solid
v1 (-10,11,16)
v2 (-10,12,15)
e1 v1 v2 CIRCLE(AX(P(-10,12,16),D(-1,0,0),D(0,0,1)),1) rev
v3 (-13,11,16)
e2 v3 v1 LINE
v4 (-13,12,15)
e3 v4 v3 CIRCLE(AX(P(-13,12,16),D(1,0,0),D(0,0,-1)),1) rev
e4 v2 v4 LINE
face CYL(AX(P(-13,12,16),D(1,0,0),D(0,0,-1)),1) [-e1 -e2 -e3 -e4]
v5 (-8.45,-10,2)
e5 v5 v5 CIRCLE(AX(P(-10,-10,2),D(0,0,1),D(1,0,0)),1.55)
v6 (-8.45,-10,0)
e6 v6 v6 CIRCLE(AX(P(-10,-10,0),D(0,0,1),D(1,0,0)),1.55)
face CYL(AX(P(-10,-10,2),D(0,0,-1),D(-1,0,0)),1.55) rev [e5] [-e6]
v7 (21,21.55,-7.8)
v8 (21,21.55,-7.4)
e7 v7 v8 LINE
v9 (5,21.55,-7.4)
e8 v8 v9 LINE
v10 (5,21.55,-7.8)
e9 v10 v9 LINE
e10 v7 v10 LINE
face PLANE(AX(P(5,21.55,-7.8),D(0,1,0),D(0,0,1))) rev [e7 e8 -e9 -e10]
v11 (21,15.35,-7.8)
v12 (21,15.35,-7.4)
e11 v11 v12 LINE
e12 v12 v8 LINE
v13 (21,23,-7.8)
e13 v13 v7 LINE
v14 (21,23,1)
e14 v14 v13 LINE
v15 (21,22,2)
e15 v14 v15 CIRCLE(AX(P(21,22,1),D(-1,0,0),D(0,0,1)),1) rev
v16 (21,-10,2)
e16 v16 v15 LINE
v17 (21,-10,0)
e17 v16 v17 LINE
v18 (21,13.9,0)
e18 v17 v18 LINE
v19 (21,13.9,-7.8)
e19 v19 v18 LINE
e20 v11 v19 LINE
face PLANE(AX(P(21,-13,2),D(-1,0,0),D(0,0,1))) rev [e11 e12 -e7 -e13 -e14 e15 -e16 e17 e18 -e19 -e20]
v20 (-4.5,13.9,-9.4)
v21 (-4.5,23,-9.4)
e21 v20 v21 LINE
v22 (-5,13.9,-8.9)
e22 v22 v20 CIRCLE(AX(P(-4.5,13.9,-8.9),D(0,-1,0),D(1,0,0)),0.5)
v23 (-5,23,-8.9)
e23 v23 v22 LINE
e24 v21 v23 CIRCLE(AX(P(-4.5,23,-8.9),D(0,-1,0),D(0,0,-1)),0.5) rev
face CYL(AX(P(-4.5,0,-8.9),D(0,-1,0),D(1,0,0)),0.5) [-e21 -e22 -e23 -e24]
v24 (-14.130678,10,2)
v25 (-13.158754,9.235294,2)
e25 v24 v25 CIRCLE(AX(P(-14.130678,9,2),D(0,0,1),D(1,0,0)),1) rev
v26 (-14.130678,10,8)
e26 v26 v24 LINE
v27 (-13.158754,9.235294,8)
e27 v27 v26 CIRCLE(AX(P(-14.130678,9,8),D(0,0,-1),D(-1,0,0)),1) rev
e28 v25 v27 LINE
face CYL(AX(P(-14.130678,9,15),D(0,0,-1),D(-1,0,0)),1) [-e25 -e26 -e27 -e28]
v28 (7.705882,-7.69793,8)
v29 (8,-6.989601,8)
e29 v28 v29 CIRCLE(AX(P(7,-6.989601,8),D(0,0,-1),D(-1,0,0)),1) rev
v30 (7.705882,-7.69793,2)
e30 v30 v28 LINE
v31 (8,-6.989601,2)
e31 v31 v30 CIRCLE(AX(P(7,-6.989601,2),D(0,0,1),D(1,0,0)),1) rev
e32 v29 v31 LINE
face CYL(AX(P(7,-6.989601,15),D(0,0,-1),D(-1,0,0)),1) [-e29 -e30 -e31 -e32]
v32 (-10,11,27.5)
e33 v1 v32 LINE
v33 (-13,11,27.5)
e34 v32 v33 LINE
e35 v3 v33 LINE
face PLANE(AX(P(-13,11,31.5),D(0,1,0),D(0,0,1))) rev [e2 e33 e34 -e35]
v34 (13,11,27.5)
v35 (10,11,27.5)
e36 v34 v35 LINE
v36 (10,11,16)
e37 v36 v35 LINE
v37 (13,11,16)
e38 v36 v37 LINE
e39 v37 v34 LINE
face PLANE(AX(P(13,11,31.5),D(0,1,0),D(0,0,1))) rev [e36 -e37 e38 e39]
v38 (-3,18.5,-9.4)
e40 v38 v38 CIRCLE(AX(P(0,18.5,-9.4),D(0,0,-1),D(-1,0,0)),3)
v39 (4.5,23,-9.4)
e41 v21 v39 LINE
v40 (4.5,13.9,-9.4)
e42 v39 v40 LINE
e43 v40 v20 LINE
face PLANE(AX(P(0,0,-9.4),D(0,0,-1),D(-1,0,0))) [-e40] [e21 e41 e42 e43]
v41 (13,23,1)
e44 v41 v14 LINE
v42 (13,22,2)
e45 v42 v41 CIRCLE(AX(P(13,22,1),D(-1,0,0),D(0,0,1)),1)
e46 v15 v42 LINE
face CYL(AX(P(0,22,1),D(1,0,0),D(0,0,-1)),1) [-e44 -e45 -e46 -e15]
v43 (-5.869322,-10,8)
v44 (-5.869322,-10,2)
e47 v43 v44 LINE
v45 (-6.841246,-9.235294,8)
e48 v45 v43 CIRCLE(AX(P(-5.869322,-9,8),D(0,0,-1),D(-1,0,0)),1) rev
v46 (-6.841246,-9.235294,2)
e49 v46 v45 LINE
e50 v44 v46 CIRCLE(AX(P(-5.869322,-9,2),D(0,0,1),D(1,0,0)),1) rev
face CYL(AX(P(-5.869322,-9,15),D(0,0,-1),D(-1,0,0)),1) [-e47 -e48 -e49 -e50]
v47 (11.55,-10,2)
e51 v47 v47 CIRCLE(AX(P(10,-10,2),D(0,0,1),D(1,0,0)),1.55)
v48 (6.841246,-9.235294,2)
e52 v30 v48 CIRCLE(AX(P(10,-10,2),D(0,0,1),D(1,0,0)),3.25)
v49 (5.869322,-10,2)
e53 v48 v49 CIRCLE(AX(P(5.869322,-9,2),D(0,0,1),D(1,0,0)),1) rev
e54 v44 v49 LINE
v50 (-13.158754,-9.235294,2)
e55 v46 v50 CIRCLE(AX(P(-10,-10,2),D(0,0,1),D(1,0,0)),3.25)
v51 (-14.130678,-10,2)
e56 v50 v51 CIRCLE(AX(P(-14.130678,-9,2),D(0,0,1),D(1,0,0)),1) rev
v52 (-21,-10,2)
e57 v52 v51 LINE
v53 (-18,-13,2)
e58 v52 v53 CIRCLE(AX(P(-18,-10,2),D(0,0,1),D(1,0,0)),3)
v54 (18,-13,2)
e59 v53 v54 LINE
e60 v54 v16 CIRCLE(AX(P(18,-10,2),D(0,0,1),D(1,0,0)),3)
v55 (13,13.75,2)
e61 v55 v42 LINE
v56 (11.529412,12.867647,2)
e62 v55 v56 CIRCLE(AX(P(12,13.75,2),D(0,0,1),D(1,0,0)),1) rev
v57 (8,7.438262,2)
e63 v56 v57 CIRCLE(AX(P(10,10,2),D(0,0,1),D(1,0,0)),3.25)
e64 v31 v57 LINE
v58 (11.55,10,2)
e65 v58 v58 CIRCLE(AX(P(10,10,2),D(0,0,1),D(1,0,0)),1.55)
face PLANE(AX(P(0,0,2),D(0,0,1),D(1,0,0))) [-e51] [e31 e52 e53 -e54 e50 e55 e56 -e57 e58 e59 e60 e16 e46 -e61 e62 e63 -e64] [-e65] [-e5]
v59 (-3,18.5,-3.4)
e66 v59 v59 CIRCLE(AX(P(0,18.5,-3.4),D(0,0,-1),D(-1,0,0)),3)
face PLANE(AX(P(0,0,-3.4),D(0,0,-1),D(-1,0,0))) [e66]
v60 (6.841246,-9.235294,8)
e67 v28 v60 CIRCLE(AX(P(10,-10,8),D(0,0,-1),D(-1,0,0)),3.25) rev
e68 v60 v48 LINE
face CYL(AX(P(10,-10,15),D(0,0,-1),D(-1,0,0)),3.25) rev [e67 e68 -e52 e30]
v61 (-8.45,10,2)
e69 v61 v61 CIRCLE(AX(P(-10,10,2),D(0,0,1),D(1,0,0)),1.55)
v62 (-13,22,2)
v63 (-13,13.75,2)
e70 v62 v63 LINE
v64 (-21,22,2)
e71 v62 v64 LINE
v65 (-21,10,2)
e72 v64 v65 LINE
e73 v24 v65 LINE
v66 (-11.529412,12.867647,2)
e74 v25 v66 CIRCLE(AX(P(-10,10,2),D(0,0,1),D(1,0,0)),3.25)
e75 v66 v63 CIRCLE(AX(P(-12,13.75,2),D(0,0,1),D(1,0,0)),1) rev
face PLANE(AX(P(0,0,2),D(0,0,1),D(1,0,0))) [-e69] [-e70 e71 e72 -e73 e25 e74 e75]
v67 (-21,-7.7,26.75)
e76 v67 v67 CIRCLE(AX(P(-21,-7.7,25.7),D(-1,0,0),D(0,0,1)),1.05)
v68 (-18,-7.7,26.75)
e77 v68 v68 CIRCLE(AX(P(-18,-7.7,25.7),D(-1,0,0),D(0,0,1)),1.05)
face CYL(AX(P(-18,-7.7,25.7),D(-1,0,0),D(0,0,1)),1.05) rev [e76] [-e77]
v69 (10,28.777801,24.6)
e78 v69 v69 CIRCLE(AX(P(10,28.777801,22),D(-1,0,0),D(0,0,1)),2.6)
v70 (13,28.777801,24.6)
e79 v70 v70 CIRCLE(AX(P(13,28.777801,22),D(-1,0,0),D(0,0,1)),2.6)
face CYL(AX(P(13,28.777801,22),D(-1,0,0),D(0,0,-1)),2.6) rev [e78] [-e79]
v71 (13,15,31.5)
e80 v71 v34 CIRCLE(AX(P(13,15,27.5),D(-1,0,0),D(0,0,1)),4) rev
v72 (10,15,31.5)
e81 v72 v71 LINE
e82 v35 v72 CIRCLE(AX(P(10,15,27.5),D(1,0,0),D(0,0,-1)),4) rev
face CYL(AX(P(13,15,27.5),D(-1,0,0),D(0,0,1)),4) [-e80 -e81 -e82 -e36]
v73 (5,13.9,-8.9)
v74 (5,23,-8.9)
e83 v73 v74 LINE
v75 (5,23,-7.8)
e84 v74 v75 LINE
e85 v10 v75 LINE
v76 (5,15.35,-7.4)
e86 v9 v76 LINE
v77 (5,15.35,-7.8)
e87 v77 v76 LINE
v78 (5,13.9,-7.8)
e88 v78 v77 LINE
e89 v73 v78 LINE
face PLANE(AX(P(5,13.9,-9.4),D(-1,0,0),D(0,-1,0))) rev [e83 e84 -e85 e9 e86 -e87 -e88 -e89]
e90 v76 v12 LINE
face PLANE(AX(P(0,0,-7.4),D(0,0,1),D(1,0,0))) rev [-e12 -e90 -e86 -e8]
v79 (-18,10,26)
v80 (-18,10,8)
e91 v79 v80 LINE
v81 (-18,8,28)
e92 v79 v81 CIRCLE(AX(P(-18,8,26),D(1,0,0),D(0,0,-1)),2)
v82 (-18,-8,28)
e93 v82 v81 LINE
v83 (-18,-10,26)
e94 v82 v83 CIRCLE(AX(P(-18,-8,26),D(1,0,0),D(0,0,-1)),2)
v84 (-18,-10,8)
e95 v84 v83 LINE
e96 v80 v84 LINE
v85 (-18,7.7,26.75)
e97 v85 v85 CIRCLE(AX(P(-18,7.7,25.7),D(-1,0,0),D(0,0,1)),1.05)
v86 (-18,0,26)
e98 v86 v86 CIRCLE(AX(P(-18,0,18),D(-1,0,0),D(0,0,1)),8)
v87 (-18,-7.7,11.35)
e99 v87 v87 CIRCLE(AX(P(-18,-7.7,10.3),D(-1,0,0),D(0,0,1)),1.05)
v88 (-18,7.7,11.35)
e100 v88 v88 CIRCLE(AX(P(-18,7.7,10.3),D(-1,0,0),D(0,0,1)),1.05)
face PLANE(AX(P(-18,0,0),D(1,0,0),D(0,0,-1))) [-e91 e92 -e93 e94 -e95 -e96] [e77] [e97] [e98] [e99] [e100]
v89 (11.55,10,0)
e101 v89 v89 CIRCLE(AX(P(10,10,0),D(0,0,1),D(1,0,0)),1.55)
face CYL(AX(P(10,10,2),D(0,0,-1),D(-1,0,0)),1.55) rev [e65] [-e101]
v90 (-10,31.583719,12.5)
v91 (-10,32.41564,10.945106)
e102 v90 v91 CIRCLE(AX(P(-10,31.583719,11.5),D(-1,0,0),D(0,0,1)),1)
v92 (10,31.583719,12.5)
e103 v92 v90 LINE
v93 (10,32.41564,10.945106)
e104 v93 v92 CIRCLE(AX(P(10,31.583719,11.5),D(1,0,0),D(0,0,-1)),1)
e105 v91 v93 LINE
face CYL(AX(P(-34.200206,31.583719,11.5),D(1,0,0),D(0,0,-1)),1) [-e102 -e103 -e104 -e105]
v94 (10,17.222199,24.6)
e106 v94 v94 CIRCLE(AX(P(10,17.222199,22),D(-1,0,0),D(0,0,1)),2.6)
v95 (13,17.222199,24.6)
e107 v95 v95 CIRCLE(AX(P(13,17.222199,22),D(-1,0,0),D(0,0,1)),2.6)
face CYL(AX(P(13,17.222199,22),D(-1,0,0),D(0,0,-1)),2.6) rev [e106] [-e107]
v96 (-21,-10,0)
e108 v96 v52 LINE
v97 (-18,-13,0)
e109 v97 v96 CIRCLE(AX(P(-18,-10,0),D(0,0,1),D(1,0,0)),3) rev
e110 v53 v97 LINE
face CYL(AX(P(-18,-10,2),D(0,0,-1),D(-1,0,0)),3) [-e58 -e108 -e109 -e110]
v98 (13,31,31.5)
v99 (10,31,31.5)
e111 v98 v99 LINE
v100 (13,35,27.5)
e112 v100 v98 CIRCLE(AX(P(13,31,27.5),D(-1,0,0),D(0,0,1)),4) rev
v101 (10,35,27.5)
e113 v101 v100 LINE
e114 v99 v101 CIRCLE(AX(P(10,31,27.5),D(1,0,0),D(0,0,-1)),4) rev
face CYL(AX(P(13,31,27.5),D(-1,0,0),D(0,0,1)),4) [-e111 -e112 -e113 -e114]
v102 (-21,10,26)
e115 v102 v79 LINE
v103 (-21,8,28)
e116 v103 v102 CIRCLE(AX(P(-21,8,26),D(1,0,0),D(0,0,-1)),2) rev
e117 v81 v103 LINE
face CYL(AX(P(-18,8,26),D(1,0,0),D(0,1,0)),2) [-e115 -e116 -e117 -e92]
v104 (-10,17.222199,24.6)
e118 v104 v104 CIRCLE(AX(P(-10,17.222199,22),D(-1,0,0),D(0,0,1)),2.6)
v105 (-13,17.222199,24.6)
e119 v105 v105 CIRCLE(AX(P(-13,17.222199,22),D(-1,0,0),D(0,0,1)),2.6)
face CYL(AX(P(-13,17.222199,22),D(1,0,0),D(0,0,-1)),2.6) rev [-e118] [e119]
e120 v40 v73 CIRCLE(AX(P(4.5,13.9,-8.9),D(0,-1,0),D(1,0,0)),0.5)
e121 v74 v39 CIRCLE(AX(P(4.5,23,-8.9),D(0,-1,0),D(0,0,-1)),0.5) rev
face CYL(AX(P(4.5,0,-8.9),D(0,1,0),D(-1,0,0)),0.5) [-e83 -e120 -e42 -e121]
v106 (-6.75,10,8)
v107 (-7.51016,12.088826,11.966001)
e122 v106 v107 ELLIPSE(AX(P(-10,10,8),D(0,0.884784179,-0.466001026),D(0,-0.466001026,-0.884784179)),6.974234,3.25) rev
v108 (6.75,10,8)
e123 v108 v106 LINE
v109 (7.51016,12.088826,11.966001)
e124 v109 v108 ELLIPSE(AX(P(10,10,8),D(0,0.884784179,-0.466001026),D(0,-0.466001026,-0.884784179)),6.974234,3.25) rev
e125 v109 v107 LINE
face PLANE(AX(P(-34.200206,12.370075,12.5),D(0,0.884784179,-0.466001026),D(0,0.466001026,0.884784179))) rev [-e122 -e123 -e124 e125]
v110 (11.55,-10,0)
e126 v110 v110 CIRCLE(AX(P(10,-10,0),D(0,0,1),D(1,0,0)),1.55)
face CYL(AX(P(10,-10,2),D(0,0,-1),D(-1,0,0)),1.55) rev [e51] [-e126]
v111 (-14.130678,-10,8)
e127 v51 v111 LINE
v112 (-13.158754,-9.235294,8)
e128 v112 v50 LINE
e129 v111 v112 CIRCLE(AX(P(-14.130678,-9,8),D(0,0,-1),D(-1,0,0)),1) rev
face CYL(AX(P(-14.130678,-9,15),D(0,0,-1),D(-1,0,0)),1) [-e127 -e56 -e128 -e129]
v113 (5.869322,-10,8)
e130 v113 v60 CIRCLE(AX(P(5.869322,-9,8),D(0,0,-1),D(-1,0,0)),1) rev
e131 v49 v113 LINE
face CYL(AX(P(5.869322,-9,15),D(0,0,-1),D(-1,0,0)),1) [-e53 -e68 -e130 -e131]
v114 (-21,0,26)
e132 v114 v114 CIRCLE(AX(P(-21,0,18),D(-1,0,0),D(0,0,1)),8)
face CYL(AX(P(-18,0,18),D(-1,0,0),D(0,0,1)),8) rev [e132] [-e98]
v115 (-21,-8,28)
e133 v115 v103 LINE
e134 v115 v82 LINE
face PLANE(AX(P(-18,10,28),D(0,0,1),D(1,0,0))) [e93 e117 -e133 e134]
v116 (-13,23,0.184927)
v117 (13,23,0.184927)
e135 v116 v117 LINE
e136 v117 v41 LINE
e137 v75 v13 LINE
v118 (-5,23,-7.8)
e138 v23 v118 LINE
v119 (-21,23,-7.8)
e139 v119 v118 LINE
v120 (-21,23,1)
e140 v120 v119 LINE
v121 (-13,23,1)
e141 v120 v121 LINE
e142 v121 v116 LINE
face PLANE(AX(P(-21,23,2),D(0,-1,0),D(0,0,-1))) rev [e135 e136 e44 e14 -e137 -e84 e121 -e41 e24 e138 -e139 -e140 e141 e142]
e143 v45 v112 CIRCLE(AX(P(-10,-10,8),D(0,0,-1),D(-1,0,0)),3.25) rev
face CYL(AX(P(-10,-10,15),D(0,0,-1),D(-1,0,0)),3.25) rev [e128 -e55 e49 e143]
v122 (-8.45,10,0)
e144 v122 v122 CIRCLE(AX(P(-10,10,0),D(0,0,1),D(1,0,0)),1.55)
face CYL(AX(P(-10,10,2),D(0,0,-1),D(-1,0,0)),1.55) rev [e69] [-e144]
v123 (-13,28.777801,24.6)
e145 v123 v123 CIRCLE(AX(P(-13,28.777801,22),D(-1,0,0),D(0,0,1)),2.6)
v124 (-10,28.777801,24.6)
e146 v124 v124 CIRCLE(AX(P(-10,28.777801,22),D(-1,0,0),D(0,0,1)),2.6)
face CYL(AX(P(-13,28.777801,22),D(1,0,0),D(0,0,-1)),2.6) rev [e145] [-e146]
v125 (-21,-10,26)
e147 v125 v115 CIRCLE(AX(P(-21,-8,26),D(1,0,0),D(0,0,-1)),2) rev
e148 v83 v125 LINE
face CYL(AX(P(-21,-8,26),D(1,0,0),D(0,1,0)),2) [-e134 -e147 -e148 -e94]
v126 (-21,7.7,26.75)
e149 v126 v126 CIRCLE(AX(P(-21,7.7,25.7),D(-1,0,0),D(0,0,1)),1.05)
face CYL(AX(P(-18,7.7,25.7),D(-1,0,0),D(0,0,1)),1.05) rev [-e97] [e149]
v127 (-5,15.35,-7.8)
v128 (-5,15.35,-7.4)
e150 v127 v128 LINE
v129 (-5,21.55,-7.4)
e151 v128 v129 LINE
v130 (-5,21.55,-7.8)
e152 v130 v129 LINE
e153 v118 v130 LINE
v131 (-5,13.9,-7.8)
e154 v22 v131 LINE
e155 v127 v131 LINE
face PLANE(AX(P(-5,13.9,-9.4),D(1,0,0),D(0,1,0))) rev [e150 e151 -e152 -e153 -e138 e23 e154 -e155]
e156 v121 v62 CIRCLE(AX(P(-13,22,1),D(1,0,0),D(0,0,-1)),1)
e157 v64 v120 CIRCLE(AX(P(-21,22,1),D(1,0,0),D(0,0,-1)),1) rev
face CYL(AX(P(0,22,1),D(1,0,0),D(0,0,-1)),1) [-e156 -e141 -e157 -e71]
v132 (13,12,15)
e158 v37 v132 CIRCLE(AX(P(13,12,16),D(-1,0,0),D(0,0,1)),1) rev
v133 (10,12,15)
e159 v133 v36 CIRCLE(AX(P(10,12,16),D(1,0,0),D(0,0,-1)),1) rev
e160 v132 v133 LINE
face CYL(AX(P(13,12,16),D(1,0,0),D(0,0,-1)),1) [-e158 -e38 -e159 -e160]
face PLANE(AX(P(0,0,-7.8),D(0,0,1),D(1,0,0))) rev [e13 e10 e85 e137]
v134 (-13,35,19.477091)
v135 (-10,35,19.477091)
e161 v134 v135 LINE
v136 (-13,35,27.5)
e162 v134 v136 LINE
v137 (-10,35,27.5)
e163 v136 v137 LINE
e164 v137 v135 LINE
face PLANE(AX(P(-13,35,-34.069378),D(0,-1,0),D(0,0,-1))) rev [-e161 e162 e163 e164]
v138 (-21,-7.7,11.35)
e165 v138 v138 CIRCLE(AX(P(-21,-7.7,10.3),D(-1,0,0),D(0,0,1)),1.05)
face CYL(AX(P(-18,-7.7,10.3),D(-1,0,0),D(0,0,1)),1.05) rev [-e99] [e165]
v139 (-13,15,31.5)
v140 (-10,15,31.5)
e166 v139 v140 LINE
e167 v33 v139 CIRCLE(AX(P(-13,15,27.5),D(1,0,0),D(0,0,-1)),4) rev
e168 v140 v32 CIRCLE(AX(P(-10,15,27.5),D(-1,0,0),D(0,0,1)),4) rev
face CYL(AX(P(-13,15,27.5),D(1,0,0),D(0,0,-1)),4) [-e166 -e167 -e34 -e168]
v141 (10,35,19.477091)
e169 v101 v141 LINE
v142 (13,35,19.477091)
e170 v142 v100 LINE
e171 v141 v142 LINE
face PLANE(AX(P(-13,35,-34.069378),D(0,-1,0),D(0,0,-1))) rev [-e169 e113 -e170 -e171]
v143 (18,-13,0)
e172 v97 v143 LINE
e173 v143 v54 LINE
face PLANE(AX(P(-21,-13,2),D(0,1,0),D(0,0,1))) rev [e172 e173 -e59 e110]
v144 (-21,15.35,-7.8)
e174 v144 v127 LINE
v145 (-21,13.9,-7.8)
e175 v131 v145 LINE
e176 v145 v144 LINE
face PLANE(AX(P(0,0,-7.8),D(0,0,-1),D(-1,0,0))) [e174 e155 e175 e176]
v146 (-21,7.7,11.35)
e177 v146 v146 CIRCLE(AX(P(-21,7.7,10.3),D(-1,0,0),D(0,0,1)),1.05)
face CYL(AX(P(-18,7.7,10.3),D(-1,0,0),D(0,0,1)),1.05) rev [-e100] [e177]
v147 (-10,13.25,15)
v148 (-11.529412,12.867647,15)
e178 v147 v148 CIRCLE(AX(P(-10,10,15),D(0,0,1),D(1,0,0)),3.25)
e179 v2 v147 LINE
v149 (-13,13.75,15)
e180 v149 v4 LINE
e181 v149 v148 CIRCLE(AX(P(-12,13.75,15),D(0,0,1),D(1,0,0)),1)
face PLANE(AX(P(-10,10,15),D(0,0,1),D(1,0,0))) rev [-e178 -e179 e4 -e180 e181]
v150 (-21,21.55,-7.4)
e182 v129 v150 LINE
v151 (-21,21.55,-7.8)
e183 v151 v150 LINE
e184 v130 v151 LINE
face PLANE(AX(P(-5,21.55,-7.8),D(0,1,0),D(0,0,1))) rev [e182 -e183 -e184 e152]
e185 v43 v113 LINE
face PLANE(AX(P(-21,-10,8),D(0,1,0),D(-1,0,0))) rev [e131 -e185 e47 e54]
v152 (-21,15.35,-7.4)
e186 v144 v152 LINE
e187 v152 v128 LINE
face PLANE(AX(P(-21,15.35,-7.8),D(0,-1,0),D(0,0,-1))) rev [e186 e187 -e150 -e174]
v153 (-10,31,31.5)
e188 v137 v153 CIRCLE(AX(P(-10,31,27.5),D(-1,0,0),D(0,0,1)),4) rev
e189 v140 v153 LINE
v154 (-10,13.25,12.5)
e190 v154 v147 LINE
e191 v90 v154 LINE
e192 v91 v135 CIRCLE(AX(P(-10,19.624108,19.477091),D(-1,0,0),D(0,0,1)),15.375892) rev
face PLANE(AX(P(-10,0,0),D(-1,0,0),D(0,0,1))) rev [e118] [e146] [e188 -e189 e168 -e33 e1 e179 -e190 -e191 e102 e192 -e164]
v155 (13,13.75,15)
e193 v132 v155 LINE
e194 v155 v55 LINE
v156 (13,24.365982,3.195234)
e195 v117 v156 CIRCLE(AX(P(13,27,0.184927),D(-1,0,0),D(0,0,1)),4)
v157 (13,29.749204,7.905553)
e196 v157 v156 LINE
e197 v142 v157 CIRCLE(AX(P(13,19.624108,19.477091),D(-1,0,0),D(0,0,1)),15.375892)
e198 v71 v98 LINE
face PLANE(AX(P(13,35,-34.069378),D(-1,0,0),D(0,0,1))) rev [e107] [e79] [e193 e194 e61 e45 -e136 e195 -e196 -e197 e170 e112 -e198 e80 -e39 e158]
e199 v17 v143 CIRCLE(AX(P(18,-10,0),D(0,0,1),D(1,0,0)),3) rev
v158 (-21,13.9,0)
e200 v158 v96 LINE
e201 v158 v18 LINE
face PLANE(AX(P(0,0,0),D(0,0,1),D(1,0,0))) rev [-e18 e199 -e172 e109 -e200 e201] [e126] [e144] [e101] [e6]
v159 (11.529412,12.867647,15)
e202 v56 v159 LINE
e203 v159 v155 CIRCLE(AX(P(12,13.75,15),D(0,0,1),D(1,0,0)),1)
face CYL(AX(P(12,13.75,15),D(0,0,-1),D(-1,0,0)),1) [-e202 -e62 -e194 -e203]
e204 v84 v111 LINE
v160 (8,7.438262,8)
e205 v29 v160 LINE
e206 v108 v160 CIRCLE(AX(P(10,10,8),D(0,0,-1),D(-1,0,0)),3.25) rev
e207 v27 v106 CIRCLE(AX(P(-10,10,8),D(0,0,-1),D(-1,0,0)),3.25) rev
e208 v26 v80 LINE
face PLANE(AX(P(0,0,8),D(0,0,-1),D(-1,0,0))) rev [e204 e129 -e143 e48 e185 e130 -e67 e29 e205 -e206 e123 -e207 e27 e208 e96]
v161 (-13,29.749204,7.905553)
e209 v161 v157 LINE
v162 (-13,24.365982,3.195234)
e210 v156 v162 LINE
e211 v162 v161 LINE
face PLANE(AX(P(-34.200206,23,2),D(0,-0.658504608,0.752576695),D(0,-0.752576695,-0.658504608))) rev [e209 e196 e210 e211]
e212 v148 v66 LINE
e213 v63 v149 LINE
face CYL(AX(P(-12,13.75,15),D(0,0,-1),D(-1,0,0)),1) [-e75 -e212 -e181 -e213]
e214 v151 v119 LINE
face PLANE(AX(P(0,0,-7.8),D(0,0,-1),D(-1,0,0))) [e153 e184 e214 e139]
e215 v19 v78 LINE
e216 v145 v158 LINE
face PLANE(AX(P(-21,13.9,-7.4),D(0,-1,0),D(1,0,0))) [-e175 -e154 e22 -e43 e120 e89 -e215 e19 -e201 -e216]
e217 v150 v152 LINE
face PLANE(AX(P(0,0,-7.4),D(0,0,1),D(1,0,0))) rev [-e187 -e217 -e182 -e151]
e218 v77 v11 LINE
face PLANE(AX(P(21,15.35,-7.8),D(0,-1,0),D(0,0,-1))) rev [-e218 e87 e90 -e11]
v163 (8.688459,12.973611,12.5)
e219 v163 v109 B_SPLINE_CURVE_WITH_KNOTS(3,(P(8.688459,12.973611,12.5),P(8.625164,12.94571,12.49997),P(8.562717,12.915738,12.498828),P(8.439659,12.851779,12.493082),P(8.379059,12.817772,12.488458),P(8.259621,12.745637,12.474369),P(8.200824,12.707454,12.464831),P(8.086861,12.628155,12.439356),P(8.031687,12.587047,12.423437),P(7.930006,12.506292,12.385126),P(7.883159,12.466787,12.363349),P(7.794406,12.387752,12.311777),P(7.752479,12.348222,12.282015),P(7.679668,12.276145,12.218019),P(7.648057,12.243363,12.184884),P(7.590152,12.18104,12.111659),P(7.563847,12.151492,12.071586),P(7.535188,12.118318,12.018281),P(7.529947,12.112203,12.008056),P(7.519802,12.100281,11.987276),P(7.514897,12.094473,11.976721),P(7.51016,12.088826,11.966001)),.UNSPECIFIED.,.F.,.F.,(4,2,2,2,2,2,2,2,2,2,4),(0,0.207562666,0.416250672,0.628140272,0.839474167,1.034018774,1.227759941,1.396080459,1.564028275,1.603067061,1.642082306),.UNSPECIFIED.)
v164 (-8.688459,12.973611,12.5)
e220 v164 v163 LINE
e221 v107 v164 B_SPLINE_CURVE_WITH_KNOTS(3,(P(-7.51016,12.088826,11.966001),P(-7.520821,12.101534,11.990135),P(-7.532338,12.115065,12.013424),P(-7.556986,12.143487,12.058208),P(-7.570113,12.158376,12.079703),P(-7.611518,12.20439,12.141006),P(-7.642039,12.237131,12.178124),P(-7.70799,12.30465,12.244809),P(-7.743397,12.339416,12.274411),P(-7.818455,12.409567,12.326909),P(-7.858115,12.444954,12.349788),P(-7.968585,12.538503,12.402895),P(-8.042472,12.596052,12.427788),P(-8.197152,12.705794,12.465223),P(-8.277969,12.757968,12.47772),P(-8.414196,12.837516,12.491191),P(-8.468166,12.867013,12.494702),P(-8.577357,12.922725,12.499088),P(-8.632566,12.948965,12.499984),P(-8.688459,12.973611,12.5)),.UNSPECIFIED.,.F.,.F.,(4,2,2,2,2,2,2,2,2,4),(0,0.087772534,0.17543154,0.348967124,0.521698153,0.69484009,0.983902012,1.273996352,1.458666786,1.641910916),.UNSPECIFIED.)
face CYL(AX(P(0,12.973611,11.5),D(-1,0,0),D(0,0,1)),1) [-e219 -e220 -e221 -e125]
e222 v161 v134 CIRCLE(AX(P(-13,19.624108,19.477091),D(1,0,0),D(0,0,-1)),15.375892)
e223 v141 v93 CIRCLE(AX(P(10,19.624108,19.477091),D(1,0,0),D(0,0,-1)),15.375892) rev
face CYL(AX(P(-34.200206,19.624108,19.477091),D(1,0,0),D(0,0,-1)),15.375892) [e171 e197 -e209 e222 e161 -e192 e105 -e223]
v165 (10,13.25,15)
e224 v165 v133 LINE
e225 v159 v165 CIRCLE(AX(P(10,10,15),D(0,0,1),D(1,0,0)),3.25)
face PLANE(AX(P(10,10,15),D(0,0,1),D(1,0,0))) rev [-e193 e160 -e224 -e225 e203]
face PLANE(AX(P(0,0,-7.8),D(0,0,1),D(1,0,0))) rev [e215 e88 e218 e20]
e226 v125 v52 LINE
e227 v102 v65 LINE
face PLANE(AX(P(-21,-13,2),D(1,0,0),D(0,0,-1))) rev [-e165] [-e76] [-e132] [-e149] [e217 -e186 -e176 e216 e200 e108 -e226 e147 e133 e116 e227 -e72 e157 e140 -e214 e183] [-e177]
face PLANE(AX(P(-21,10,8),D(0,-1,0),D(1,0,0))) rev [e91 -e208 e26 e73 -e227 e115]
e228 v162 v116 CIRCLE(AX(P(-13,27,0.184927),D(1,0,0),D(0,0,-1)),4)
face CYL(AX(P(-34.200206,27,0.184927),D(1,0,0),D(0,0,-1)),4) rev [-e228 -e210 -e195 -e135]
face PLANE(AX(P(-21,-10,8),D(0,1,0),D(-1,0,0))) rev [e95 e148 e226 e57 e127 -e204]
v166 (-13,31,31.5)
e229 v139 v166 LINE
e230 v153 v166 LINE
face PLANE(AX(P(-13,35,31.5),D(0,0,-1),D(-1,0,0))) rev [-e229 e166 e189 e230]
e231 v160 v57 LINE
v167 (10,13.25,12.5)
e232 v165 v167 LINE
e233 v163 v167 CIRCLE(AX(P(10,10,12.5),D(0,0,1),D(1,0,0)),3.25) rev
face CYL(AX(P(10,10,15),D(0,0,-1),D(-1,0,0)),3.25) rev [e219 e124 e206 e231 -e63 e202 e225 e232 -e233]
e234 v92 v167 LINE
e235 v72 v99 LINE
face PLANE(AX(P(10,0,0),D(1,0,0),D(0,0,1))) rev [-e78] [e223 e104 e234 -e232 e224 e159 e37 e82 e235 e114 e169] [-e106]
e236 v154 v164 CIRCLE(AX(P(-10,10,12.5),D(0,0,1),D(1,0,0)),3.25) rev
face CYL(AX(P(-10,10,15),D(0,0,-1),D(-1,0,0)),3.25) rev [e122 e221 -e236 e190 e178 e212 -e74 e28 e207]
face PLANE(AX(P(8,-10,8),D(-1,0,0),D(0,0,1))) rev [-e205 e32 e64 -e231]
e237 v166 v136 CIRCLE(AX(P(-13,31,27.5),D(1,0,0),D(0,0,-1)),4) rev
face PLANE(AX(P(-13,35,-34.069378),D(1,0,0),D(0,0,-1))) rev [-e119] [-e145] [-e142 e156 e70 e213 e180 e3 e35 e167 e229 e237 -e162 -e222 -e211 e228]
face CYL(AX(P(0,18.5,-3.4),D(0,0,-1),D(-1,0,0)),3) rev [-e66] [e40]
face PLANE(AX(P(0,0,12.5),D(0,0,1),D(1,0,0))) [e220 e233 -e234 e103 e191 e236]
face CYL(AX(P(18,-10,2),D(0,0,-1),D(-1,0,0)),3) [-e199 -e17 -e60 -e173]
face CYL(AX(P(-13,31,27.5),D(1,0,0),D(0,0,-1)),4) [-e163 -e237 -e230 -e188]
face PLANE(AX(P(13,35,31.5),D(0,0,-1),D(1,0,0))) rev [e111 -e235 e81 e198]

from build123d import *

# Parameters (mm, degrees)
SKETCH1_W           = 36
SKETCH1_H           = 42
SKETCH1_R           = 1.55
BOSS_EXTRUDE1_DEPTH = 2
SKETCH5_W           = 42
SKETCH5_H           = 9.1
BOSS_EXTRUDE2_DEPTH = 7.4
SKETCH6_W           = 10
SKETCH6_H           = 9.1
BOSS_EXTRUDE3_DEPTH = 2
SKETCH2_R           = 3
CUT_EXTRUDE1_DEPTH  = 6
SKETCH4_W           = 16
SKETCH4_H           = 1.45
BOSS_EXTRUDE4_DEPTH = 0.4
FILLET2_R           = 3
FILLET3_R           = 0.5
SKETCH7_W           = 29
SKETCH7_H           = 20
BOSS_EXTRUDE5_DEPTH = 6
SKETCH8_W           = 20
SKETCH8_H           = 20
SKETCH8_R           = 8
SKETCH8_R_2         = 1.05
BOSS_EXTRUDE6_DEPTH = 3
FILLET4_R           = 2
SKETCH10_W          = 24
SKETCH10_H          = 19
SKETCH10_R          = 2.6
BOSS_EXTRUDE7_DEPTH = 3
SKETCH14_W          = 26
SKETCH14_H          = 25
BOSS_EXTRUDE8_DEPTH = 10.5
CUT_EXTRUDE3_REACH  = 60.08
SKETCH9_R           = 3.25
CUT_EXTRUDE2_DEPTH  = 13
FILLET6_R           = 1
FILLET7_R           = 1
FILLET8_R           = 4
FILLET9_R           = 1
FILLET10_R          = 1


with BuildPart() as part:
    # Sketch1 → Boss-Extrude1 (new body)
    with BuildSketch(Plane(origin=(0, 0, 0), x_dir=(0, 1, 0), z_dir=(0, 0, 1))):
        with Locations((5, 0)):
            Rectangle(SKETCH1_W, SKETCH1_H)
        with Locations(Location((-10, -10, 0), (0, 0, 270))):
            Circle(SKETCH1_R, mode=Mode.SUBTRACT)
        with Locations(Location((10, -10, 0), (0, 0, 270))):
            Circle(SKETCH1_R, mode=Mode.SUBTRACT)
        with Locations(Location((10, 10, 0), (0, 0, 270))):
            Circle(SKETCH1_R, mode=Mode.SUBTRACT)
        with Locations(Location((-10, 10, 0), (0, 0, 270))):
            Circle(SKETCH1_R, mode=Mode.SUBTRACT)
    extrude(amount=BOSS_EXTRUDE1_DEPTH)

    # Sketch5 → Boss-Extrude2 (add)
    with BuildSketch(Plane.XY):
        with Locations((0, 18.45)):
            Rectangle(SKETCH5_W, SKETCH5_H)
    extrude(amount=-BOSS_EXTRUDE2_DEPTH)

    # Sketch6 → Boss-Extrude3 (add)
    with BuildSketch(Plane(origin=(0, 0, -7.4), x_dir=(1, 0, 0), z_dir=(0, 0, -1))):
        with Locations((0, -18.45)):
            Rectangle(SKETCH6_W, SKETCH6_H)
    extrude(amount=BOSS_EXTRUDE3_DEPTH)

    # Sketch2 → Cut-Extrude1 (cut)
    with BuildSketch(Plane(origin=(0, 0, -9.4), x_dir=(1, 0, 0), z_dir=(0, 0, -1))):
        with Locations(Location((0, -18.5, 0), (0, 0, 180))):
            Circle(SKETCH2_R)
    extrude(amount=-CUT_EXTRUDE1_DEPTH, mode=Mode.SUBTRACT)

    # Sketch4 → Boss-Extrude4 (add)
    with BuildSketch(Plane(origin=(0, 0, -7.4), x_dir=(1, 0, 0), z_dir=(0, 0, -1))):
        with Locations((-13, -14.625)):
            Rectangle(SKETCH4_W, SKETCH4_H)
        with Locations((-13, -22.275)):
            Rectangle(SKETCH4_W, SKETCH4_H)
        with Locations((13, -14.625)):
            Rectangle(SKETCH4_W, SKETCH4_H)
        with Locations((13, -22.275)):
            Rectangle(SKETCH4_W, SKETCH4_H)
    extrude(amount=BOSS_EXTRUDE4_DEPTH)

    # Fillet2
    fillet2_edges = [part.edges().sort_by_distance(p)[0] for p in [
        (-21, -13, 1),
        (21, -13, 1),
    ]]
    fillet(fillet2_edges, radius=FILLET2_R)

    # Fillet3
    fillet3_edges = [part.edges().sort_by_distance(p)[0] for p in [
        (-5, 18.45, -9.4),
        (5, 18.45, -9.4),
    ]]
    fillet(fillet3_edges, radius=FILLET3_R)

    # Sketch7 → Boss-Extrude5 (add)
    with BuildSketch(Plane.XY.offset(2)):
        with Locations((-6.5, 0)):
            Rectangle(SKETCH7_W, SKETCH7_H)
    extrude(amount=BOSS_EXTRUDE5_DEPTH)

    # Sketch8 → Boss-Extrude6 (add)
    with BuildSketch(Plane(origin=(-21, 0, 0), x_dir=(0, -1, 0), z_dir=(-1, 0, 0))):
        with Locations((0, 18)):
            Rectangle(SKETCH8_W, SKETCH8_H)
        with Locations(Location((0, 18, 0), (0, 0, 90))):
            Circle(SKETCH8_R, mode=Mode.SUBTRACT)
        with Locations(Location((7.7, 25.7, 0), (0, 0, 90))):
            Circle(SKETCH8_R_2, mode=Mode.SUBTRACT)
        with Locations(Location((7.7, 10.3, 0), (0, 0, 90))):
            Circle(SKETCH8_R_2, mode=Mode.SUBTRACT)
        with Locations(Location((-7.7, 25.7, 0), (0, 0, 90))):
            Circle(SKETCH8_R_2, mode=Mode.SUBTRACT)
        with Locations(Location((-7.7, 10.3, 0), (0, 0, 90))):
            Circle(SKETCH8_R_2, mode=Mode.SUBTRACT)
    extrude(amount=-BOSS_EXTRUDE6_DEPTH)

    # Fillet4
    fillet4_edges = [part.edges().sort_by_distance(p)[0] for p in [
        (-19.5, 10, 28),
        (-19.5, -10, 28),
    ]]
    fillet(fillet4_edges, radius=FILLET4_R)



with BuildPart() as body_2:
    # Sketch10 → Boss-Extrude7 (new body)
    with BuildSketch(Plane(origin=(-10, 0, 0), x_dir=(0, 1, 0), z_dir=(-1, 0, 0))):
        with Locations((23, -22)):
            Rectangle(SKETCH10_W, SKETCH10_H)
        with Locations(Location((28.777800617, -22, 0), (0, 0, 270))):
            Circle(SKETCH10_R, mode=Mode.SUBTRACT)
        with Locations(Location((17.222199383, -22, 0), (0, 0, 270))):
            Circle(SKETCH10_R, mode=Mode.SUBTRACT)
    extrude(amount=BOSS_EXTRUDE7_DEPTH)


with BuildPart() as body_3:
    # Mirror1: mirrored copy
    add(body_2.part.mirror(Plane(origin=(0, 0, 0), x_dir=(0, 0, 1), z_dir=(1, 0, 0))))


with BuildPart() as part_1:
    add(part.part)

    add(body_2.part)  # Boss-Extrude8 merges body 2

    add(body_3.part)  # Boss-Extrude8 merges body 3
    # Sketch14 → Boss-Extrude8 (add)
    with BuildSketch(Plane(origin=(0, 0, 12.5), x_dir=(1, 0, 0), z_dir=(0, 0, -1))):
        with Locations((0, -22.5)):
            Rectangle(SKETCH14_W, SKETCH14_H)
    extrude(amount=BOSS_EXTRUDE8_DEPTH)

    # Cut-Extrude3: up to this face of the body (flat: up to its plane)
    cut_extrude3_end = Plane(part_1.part.faces().sort_by_distance((-13, 22.805850567, 16.272591727))[0])
    # Sketch15 → Cut-Extrude3 (cut, up to the picked face)
    with BuildSketch(Plane.YZ.offset(13), mode=Mode.PRIVATE) as cut_extrude3_sk1:
        with BuildLine():
            Line((23, 2), (29.749203665, 7.905553207))
            ThreePointArc((29.749203665, 7.905553207), (33.625901319, 13.123522322), (35, 19.477091335))
            Line((35, 19.477091335), (35, 12.5))
            Line((35, 12.5), (35, 2))
            Line((35, 2), (23, 2))
        make_face()
    cut_extrude3_tool1 = split(extrude(cut_extrude3_sk1.sketch, amount=-CUT_EXTRUDE3_REACH, mode=Mode.PRIVATE), bisect_by=cut_extrude3_end, keep=Keep.BOTH, mode=Mode.PRIVATE)
    # Sketch15 → Cut-Extrude3 (cut, up to the picked face)
    with BuildSketch(Plane.YZ.offset(13), mode=Mode.PRIVATE) as cut_extrude3_sk2:
        Polygon((12.370074724, 12.5), (10, 8), (10, 12.5), align=None)
    cut_extrude3_tool2 = split(extrude(cut_extrude3_sk2.sketch, amount=-CUT_EXTRUDE3_REACH, mode=Mode.PRIVATE), bisect_by=cut_extrude3_end, keep=Keep.BOTH, mode=Mode.PRIVATE)
    add(cut_extrude3_tool1.solids().sort_by(Axis((13, 31.275358, 6.207395), (-1, 0, 0)))[0], mode=Mode.SUBTRACT)
    add(cut_extrude3_tool2.solids().sort_by(Axis((13, 10.790025, 11), (-1, 0, 0)))[0], mode=Mode.SUBTRACT)

    # Sketch9 → Cut-Extrude2 (cut)
    with BuildSketch(Plane.XY.offset(2)):
        with Locations((-10, 10)):
            Circle(SKETCH9_R)
        with Locations((10, 10)):
            Circle(SKETCH9_R)
        with Locations((10, -10)):
            Circle(SKETCH9_R)
        with Locations((-10, -10)):
            Circle(SKETCH9_R)
    extrude(amount=CUT_EXTRUDE2_DEPTH, mode=Mode.SUBTRACT)

    # Fillet6
    # the kernel refuses this fillet: 1 mm, written as the material it takes off along each edge
    with BuildSketch(Plane(origin=(-13, 11.25, 15), x_dir=(0, 1, 0), z_dir=(0, 0, -1))) as fillet6_piece_1:
        with BuildLine():
            CenterArc((2.5, 1), FILLET6_R, 151.927513064, 118.072486936)
            ThreePointArc((1.617647059, 1.470588235), (0.93618658, 0.595194761), (0, 0))
            Line((0, 0), (2.5, 0))
        make_face()
    extrude(amount=8.75, mode=Mode.SUBTRACT)
    with BuildSketch(Plane(origin=(-13, 11.25, 16.623342892), x_dir=(0, 1, 0), z_dir=(0, 0, -1))) as fillet6_piece_2_section:
        with BuildLine():
            CenterArc((2.5, 1), FILLET6_R, 151.927513064, 118.072486936)
            ThreePointArc((1.617647059, 1.470588235), (0.93618658, 0.595194761), (0, 0))
            Line((0, 0), (2.5, 0))
        make_face()
    fillet6_piece_2 = extrude(amount=14.623342892, mode=Mode.PRIVATE)
    fillet6_piece_2 = split(fillet6_piece_2, bisect_by=Plane(origin=(-12.647638468, 12.372868888, 15), z_dir=(0, 0, -1)), keep=Keep.TOP, mode=Mode.PRIVATE)
    add(fillet6_piece_2, mode=Mode.SUBTRACT)
    with BuildSketch(Plane(origin=(-13.25, 10, 10.201694776), x_dir=(-1, 0, 0), z_dir=(0, 0, -1))) as fillet6_piece_3:
        with BuildLine():
            CenterArc((0.88067791, -1), FILLET6_R, 90, 76.391039369)
            ThreePointArc((-0.091246304, -0.764705882), (-0.022892199, -0.385065246), (0, 0))
            Line((0, 0), (0.88067791, 0))
        make_face()
    extrude(amount=8.201694776, mode=Mode.SUBTRACT)
    with BuildSketch(Plane(origin=(-6.75, -10, 2), x_dir=(1, 0, 0), z_dir=(0, 0, 1)), Plane(origin=(-13.25, -10, 10.201694776), x_dir=(-1, 0, 0), z_dir=(0, 0, -1))) as fillet6_piece_4:
        with BuildLine():
            CenterArc((0.88067791, 1), FILLET6_R, 193.608960631, 76.391039369)
            ThreePointArc((-0.091246304, 0.764705882), (-0.022892199, 0.385065246), (0, 0))
            Line((0, 0), (0.88067791, 0))
        make_face()
    extrude(amount=8.201694776, mode=Mode.SUBTRACT)
    with BuildSketch(Plane(origin=(8, -7.438262309, 9.121652383), x_dir=(0, 1, 0), z_dir=(0, 0, -1))) as fillet6_piece_5:
        with BuildLine():
            CenterArc((0.448660953, -1), FILLET6_R, 90, 45.099127844)
            ThreePointArc((-0.25966814, -0.294117647), (-0.125391755, -0.150980818), (0, 0))
            Line((0, 0), (0.448660953, 0))
        make_face()
    extrude(amount=7.121652383, mode=Mode.SUBTRACT)
    with BuildSketch(Plane(origin=(6.75, -10, 10.201694776), x_dir=(0.11848161412860787, 0.9929562463238145, 0), z_dir=(0, 0, -1))) as fillet6_piece_6:
        with BuildLine():
            CenterArc((0.888612106, -0.992956246), FILLET6_R, 96.804480315, 76.391039369)
            Line((-0.10434414, -0.874474632), (0, 0))
            ThreePointArc((0, 0), (0.385065246, -0.022892199), (0.770130492, 0))
        make_face()
    extrude(amount=8.201694776, mode=Mode.SUBTRACT)
    with BuildSketch(Plane(origin=(13, 11.25, 16.623342892), x_dir=(0, 1, 0), z_dir=(0, 0, -1))) as fillet6_piece_7_section:
        with BuildLine():
            CenterArc((2.5, -1), FILLET6_R, 90, 118.072486936)
            ThreePointArc((1.617647059, -1.470588235), (0.93618658, -0.595194761), (0, 0))
            Line((0, 0), (2.5, 0))
        make_face()
    fillet6_piece_7 = extrude(amount=14.623342892, mode=Mode.PRIVATE)
    fillet6_piece_7 = split(fillet6_piece_7, bisect_by=Plane(origin=(12.647638468, 12.372868888, 15), z_dir=(0, 0, -1)), keep=Keep.TOP, mode=Mode.PRIVATE)
    add(fillet6_piece_7, mode=Mode.SUBTRACT)
    with BuildSketch(Plane(origin=(13, 11.25, 15), x_dir=(0, 1, 0), z_dir=(0, 0, -1))) as fillet6_piece_8:
        with BuildLine():
            CenterArc((2.5, -1), FILLET6_R, 90, 118.072486936)
            ThreePointArc((1.617647059, -1.470588235), (0.93618658, -0.595194761), (0, 0))
            Line((0, 0), (2.5, 0))
        make_face()
    extrude(amount=8.75, mode=Mode.SUBTRACT)
    with BuildSketch(Plane(origin=(9.285048768, 12.370074724, 12.5), x_dir=(0, 1, 0), z_dir=(-1, 0, 0))) as fillet6_piece_9:
        with BuildLine():
            CenterArc((FILLET6_R * 0.603535852363, FILLET6_R), FILLET6_R, 207.775026011, 62.224973989)
            Line((-FILLET6_R * 0.281248326648, FILLET6_R * 0.533998973637), (0, 0))
            Line((0, 0), (FILLET6_R * 0.603535852363, 0))
        make_face()
    extrude(amount=18.570097535, mode=Mode.SUBTRACT)

    # Fillet7
    fillet7_edges = [part_1.edges().sort_by_distance(p)[0] for p in [
        (11.5, 11, 15),
        (-11.5, 11, 15),
    ]]
    fillet(fillet7_edges, radius=FILLET7_R)

    # Fillet8
    fillet8_edges = [part_1.edges().sort_by_distance(p)[0] for p in [
        (0, 23, 2),
        (-11.5, 35, 31.5),
        (-11.5, 11, 31.5),
        (11.5, 11, 31.5),
        (11.5, 35, 31.5),
    ]]
    fillet(fillet8_edges, radius=FILLET8_R)

    # Fillet9
    fillet9_edges = [part_1.edges().sort_by_distance(p)[0] for p in [
        (17, 23, 2),
        (-17, 23, 2),
    ]]
    fillet(fillet9_edges, radius=FILLET9_R)

    # Fillet10
    fillet10_edges = [part_1.edges().sort_by_distance(p)[0] for p in [
        (0, 33.325868907, 12.5),
    ]]
    fillet(fillet10_edges, radius=FILLET10_R)


solid = part_1.part
